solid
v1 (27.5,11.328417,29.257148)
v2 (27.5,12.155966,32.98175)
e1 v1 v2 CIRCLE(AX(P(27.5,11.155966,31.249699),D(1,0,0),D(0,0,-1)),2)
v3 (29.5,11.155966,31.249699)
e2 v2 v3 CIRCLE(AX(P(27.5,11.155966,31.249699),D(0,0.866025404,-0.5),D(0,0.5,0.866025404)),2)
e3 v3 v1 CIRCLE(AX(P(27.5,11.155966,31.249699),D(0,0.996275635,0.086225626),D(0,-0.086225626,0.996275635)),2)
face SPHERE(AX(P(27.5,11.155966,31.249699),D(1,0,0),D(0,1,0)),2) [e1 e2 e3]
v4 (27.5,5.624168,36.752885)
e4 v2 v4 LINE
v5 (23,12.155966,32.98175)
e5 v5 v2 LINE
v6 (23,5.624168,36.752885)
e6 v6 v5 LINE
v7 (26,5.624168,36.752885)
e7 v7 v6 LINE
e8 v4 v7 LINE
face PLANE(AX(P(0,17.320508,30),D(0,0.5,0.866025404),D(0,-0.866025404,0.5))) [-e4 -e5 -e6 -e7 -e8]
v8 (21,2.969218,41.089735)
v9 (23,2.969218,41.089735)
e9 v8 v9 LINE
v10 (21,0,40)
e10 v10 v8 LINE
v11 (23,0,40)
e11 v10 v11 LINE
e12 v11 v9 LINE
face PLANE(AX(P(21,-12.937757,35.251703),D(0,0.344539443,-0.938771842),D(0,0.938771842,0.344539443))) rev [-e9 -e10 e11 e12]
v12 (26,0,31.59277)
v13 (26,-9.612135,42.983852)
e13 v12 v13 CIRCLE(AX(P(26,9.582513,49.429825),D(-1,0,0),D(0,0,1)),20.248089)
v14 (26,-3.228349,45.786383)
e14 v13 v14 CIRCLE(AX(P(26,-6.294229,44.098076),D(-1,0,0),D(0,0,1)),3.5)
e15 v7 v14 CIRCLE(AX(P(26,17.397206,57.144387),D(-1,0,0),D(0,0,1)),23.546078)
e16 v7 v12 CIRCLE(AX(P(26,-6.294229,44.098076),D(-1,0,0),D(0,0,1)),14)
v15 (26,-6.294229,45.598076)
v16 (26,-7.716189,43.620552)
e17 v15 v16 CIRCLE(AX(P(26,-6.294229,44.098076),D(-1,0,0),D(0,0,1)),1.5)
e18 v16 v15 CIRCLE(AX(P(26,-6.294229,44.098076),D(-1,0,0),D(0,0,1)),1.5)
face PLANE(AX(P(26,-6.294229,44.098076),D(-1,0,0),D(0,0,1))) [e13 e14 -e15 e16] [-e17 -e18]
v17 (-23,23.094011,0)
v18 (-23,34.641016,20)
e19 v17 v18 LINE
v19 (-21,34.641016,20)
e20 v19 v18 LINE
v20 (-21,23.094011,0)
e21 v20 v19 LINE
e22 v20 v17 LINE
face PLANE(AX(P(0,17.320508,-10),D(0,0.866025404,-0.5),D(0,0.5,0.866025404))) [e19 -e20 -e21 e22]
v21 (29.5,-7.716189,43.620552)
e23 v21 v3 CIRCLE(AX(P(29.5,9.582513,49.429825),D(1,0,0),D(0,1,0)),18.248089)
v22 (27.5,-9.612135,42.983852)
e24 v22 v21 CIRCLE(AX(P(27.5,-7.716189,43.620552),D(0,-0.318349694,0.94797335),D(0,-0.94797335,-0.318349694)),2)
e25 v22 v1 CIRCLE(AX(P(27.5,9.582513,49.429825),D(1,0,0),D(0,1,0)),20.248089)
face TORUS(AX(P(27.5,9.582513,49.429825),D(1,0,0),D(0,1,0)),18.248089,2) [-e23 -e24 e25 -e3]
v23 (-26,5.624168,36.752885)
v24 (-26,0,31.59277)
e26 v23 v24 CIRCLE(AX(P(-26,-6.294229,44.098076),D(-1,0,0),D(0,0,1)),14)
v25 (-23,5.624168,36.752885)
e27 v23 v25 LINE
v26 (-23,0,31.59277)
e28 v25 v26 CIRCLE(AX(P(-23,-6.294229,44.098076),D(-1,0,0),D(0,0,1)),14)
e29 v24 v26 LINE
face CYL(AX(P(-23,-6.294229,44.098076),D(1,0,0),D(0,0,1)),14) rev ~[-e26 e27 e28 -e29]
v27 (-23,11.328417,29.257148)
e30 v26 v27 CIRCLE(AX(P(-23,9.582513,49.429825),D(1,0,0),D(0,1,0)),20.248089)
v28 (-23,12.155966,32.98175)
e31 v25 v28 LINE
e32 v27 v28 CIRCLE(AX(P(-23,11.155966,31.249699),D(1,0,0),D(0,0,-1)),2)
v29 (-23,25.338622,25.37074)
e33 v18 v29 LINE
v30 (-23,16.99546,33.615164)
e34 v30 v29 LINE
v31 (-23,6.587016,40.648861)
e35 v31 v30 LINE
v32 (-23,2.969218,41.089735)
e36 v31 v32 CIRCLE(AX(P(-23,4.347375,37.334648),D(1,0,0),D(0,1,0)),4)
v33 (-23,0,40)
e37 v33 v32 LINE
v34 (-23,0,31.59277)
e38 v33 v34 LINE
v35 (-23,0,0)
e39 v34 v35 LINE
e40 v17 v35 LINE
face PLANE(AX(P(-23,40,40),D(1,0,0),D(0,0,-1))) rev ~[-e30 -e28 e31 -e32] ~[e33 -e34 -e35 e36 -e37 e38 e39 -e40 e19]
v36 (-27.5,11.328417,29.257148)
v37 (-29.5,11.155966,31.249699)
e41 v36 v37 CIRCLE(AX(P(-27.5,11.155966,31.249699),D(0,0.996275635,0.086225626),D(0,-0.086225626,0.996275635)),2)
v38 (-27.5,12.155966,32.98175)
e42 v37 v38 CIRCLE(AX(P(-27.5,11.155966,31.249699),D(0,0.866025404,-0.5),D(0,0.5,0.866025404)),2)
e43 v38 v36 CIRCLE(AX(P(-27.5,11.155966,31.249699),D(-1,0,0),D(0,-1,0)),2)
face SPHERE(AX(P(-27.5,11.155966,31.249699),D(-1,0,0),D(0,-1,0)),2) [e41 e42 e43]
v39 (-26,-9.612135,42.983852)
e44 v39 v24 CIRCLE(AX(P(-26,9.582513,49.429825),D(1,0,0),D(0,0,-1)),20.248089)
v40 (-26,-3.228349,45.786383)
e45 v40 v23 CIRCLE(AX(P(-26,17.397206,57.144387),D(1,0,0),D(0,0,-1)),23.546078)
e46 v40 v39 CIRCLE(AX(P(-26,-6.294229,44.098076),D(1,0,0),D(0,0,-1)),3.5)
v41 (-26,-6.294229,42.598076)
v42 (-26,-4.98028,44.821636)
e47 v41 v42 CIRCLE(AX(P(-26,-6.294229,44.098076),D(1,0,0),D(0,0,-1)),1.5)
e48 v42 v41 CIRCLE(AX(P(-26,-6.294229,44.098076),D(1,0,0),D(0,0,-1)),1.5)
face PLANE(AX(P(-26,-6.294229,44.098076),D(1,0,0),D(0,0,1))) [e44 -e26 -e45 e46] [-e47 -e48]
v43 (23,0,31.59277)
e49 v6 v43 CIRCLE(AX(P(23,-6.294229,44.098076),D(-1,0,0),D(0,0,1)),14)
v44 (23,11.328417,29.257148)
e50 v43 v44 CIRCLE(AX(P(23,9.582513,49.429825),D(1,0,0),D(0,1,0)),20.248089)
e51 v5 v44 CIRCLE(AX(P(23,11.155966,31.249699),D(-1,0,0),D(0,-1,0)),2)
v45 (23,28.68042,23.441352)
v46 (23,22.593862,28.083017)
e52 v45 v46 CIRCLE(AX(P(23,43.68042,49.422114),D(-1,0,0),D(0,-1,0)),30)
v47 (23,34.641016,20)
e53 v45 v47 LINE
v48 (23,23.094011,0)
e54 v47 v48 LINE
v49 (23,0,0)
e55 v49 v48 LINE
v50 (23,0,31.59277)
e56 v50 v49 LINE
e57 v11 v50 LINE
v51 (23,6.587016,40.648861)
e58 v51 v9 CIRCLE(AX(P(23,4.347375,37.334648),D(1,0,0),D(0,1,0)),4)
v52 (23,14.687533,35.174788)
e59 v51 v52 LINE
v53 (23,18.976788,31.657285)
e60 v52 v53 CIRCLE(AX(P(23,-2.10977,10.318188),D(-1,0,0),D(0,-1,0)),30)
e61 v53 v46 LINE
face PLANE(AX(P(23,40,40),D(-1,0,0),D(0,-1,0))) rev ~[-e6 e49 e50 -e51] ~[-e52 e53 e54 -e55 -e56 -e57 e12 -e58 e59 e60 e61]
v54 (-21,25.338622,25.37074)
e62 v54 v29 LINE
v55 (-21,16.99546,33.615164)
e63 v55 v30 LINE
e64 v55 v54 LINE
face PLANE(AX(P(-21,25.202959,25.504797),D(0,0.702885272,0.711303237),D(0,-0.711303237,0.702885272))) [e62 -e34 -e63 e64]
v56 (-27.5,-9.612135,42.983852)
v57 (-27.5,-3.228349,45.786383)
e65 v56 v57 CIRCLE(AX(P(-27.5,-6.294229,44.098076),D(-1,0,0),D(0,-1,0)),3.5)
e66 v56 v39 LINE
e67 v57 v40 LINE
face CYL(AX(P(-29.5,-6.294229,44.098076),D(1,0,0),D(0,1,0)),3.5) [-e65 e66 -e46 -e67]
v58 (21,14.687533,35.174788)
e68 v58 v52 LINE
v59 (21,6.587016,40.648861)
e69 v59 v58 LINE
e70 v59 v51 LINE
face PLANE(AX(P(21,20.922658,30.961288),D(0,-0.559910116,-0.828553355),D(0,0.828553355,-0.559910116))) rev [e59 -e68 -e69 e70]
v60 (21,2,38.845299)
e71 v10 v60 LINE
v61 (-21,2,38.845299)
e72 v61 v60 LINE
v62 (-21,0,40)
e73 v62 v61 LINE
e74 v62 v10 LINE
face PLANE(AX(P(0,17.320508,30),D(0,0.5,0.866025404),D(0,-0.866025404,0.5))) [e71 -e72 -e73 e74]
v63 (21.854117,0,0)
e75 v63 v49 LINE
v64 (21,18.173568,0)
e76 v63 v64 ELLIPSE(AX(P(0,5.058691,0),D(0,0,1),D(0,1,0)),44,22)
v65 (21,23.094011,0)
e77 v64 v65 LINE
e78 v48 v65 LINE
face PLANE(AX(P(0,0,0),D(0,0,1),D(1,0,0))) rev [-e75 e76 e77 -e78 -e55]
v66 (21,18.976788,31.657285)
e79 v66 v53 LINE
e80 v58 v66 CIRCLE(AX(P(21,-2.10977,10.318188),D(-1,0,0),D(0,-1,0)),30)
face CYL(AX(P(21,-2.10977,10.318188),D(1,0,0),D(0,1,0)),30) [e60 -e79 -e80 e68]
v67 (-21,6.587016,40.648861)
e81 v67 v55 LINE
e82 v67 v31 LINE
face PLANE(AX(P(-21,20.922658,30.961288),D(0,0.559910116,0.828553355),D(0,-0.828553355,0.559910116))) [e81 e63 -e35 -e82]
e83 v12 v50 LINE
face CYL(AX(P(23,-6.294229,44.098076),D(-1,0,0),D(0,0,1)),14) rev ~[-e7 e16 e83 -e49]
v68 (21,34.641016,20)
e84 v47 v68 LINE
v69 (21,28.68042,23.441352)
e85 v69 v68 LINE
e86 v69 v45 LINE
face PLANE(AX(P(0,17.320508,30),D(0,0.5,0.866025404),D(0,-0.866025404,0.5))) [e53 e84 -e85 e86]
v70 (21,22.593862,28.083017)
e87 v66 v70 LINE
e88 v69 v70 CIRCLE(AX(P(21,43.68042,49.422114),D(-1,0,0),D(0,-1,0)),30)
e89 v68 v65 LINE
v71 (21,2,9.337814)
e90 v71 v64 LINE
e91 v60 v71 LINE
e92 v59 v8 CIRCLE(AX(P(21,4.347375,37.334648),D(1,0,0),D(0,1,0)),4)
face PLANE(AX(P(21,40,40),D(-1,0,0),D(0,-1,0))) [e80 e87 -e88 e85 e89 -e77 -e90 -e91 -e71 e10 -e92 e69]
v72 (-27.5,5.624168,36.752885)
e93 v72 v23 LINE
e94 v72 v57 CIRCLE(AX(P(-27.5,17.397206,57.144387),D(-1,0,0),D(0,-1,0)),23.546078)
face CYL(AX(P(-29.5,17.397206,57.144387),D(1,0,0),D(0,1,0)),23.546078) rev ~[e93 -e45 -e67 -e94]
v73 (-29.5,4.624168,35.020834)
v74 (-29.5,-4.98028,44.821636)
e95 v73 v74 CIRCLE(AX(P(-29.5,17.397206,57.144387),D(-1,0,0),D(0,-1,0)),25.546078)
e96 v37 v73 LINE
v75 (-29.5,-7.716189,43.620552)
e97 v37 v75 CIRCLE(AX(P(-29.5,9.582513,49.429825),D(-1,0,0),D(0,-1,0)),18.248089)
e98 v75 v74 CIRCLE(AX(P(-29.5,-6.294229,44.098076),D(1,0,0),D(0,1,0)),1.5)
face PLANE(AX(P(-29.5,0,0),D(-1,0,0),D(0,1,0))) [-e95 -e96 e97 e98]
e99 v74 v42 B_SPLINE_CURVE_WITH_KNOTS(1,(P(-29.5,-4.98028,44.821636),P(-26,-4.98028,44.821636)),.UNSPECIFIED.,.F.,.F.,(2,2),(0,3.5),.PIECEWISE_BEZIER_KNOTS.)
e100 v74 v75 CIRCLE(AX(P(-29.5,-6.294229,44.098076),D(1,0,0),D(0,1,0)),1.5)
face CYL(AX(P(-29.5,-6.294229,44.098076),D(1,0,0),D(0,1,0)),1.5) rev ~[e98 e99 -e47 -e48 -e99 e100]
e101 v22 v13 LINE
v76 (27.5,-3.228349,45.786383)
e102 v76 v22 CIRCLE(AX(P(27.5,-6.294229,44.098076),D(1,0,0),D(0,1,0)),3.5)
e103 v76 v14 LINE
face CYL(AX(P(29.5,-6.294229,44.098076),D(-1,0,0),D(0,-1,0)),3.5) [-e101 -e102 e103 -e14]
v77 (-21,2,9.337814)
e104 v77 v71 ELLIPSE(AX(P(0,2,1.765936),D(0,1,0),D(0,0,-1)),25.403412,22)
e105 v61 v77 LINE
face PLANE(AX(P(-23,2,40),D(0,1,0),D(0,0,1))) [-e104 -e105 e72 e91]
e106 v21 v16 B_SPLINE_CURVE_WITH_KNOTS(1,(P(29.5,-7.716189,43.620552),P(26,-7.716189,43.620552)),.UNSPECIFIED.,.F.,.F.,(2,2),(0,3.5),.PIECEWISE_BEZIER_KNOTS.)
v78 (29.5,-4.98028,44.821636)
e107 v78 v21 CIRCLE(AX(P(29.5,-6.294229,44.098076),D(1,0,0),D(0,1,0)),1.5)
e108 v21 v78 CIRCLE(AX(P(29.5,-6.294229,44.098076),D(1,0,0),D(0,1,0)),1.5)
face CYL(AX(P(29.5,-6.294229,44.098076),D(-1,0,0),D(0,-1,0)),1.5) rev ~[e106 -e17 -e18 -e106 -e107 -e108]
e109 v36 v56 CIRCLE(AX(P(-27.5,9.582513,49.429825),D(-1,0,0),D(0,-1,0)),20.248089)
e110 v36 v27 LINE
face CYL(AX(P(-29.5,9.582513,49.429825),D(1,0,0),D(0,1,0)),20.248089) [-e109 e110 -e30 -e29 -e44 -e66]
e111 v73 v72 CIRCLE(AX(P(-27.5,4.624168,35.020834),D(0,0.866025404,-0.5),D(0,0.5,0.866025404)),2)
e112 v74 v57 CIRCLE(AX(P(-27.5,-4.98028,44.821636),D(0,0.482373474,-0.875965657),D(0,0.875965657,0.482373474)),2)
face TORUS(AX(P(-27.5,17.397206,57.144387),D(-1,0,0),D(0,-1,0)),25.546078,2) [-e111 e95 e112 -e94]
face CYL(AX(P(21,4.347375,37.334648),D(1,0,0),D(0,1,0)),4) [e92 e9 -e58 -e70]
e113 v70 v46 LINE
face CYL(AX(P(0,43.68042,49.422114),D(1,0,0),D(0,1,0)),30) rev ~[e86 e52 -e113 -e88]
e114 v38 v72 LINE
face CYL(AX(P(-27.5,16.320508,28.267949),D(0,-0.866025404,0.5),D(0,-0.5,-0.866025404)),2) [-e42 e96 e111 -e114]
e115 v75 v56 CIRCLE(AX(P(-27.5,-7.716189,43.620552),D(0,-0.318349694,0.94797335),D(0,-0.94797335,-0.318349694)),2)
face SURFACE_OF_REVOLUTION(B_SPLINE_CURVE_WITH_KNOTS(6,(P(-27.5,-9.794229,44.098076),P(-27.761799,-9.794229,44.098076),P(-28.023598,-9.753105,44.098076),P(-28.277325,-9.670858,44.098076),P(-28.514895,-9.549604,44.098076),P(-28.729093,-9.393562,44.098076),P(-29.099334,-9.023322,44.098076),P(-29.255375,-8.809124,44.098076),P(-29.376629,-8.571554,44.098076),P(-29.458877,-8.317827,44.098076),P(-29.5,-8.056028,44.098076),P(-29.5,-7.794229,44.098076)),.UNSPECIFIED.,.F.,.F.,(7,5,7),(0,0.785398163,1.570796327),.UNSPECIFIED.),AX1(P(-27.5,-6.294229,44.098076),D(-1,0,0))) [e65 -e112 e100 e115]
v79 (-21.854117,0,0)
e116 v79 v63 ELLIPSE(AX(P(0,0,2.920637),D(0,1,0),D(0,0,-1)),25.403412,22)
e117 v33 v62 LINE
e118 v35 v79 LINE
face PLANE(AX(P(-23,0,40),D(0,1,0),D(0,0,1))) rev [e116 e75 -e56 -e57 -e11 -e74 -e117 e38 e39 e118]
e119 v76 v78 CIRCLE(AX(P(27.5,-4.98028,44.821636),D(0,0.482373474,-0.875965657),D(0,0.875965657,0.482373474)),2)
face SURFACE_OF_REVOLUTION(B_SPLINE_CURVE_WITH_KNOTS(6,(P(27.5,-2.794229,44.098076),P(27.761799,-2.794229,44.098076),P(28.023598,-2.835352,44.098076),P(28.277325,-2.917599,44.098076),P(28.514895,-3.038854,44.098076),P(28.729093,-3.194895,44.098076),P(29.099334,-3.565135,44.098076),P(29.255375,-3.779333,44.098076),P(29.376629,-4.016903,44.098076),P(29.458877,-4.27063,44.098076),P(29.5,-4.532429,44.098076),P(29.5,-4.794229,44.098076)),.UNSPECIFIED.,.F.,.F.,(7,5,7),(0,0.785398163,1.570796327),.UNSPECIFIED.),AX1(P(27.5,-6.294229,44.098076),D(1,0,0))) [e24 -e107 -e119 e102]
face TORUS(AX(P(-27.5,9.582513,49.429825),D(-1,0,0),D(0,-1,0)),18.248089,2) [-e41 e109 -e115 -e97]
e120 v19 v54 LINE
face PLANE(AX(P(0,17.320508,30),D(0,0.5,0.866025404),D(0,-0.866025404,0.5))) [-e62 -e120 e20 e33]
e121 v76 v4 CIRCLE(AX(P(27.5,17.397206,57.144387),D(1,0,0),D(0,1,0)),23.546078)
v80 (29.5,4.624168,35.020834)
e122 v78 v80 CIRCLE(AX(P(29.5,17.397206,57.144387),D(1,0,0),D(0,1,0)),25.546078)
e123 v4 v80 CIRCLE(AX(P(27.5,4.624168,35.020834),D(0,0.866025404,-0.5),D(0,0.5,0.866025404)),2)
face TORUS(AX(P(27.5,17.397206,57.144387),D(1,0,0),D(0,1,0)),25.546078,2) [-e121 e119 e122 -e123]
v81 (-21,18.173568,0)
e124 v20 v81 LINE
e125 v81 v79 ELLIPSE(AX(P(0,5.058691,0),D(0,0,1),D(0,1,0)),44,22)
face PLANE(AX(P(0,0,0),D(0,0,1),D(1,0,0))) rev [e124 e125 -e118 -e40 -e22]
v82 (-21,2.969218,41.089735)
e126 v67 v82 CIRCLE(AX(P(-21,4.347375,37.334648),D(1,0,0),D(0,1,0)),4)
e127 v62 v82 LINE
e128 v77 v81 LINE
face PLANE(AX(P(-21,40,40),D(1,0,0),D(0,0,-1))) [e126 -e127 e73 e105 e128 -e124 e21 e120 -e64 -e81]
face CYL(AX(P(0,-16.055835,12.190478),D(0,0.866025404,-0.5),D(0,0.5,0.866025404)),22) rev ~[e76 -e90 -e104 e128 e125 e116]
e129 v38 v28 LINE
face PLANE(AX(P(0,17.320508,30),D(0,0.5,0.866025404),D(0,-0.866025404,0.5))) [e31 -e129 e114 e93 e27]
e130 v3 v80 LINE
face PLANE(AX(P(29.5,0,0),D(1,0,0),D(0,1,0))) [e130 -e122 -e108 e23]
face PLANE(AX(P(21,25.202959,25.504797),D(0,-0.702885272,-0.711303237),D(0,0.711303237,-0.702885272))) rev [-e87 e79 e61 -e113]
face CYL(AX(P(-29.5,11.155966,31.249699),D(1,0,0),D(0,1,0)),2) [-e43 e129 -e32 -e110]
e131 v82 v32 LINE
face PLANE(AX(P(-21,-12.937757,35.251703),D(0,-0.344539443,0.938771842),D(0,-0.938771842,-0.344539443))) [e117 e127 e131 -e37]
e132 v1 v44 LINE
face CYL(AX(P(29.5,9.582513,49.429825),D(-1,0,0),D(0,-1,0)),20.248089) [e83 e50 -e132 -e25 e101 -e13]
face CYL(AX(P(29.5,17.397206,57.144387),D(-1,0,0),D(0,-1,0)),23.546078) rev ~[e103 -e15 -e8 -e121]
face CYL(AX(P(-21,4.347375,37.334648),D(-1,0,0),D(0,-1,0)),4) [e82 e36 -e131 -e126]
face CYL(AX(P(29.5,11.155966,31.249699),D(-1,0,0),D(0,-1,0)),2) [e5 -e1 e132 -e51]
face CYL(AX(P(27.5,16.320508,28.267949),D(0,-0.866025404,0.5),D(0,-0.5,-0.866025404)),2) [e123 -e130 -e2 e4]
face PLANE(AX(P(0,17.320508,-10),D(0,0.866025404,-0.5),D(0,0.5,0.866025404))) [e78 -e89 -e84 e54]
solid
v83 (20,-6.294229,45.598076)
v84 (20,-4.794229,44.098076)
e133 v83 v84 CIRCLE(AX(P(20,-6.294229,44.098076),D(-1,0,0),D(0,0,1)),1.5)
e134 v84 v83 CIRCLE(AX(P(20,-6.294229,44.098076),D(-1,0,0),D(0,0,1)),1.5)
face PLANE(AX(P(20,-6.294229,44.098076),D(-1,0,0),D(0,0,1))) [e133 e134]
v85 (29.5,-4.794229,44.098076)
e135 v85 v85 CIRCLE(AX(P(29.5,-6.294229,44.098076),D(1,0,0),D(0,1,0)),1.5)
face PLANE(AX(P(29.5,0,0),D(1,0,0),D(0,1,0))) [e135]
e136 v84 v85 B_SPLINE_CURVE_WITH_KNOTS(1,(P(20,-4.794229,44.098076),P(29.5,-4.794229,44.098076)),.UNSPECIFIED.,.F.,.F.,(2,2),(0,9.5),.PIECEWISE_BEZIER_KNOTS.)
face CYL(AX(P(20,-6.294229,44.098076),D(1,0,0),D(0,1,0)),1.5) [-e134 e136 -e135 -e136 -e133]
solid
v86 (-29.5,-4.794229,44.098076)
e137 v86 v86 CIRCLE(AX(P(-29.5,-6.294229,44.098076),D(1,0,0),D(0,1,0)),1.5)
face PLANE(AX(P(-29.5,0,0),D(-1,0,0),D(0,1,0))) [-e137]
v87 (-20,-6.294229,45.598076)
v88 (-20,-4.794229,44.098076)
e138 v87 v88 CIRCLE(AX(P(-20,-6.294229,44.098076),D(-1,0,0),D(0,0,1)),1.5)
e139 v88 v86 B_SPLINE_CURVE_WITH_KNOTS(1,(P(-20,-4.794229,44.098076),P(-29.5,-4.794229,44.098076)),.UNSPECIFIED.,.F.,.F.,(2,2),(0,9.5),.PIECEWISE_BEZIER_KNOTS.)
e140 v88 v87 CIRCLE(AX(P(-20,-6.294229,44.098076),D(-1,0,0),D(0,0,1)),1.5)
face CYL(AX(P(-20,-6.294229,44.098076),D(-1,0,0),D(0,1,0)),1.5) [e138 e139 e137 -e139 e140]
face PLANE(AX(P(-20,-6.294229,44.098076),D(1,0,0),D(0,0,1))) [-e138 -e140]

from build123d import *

# Parameters (mm, degrees)
SKETCH1_W                = 46
SKETCH1_H                = 40
BOSS_EXTRUDE1_DEPTH      = 40
SHELL1_T                 = -2
CUT_EXTRUDE1_DEPTH       = 62.065538563
CUT_EXTRUDE1_DEPTH_BACK  = 62.065538563
SKETCH2_R                = 22
SKETCH5_R                = 1.5
BOSS_EXTRUDE2_DEPTH      = 6.5
BOSS_EXTRUDE4_DEPTH      = 2
SKETCH6_W                = 3
SKETCH6_H                = 14
FILLET1_R                = 30
FILLET2_R                = 2
BOSS_EXTRUDE5_DEPTH      = 3.5
BOSS_EXTRUDE5_DEPTH_BACK = 6
BOSS_EXTRUDE5_START      = 3
SKETCH5_4_R              = 1.5
FILLET2_OF_MIRROR2_R     = 2


with BuildPart() as part:
    # Sketch1 → Boss-Extrude1 (new body)
    with BuildSketch(Plane.XY):
        with Locations((0, 20)):
            Rectangle(SKETCH1_W, SKETCH1_H)
    extrude(amount=BOSS_EXTRUDE1_DEPTH)

    # Shell1
    shell1_openings = [part.faces().sort_by_distance(p)[0] for p in [
        (0, 20, 40),
        (0, 20, 0),
        (0, 40, 20),
    ]]
    offset(amount=SHELL1_T, openings=shell1_openings, kind=Kind.INTERSECTION)

    # Sketch2 → Cut-Extrude1 (cut, two sides: drawn at the far end of the back side and taken through both)
    with BuildSketch(Plane(origin=(0, 0, 0), x_dir=(1, 0, 0), z_dir=(0, 0.866025403784438, -0.5000000000000009)).offset(-CUT_EXTRUDE1_DEPTH_BACK)):
        with Locations((0, -2.529345721)):
            Circle(SKETCH2_R)
    extrude(amount=CUT_EXTRUDE1_DEPTH + CUT_EXTRUDE1_DEPTH_BACK, mode=Mode.SUBTRACT)

    # SurfaceCut1
    split(bisect_by=Plane(origin=(0, 17.320508076, 30), x_dir=(1, 0, 0), z_dir=(0, 0.500000000000001, 0.8660254037844382)), keep=Keep.BOTTOM)

    # SurfaceCut3
    split(bisect_by=Plane(origin=(0, 17.320508076, -10), x_dir=(1, 0, 0), z_dir=(0, 0.8660254037844383, -0.5000000000000009)), keep=Keep.BOTTOM)

    # Sketch5 → Boss-Extrude2 (add)
    with BuildSketch(Plane(origin=(23, 0, 0), x_dir=(0, 0, -1), z_dir=(1, 0, 0))):
        with BuildLine():
            Line((-30.428606571, 16.578139719), (-36.752885286, 5.624167662))
            ThreePointArc((-36.752885286, 5.624167662), (-40.664109848, 0.580005541), (-45.78638337, -3.228348836))
            ThreePointArc((-45.78638337, -3.228348836), (-47.30285007, -7.701148858), (-42.983852284, -9.61213536))
            ThreePointArc((-42.983852284, -9.61213536), (-31.17133355, 0.829651746), (-30.428606571, 16.578139719))
        make_face()
        with Locations(Location((-44.098076211, -6.294228634, 0), (0, 0, 270))):
            Circle(SKETCH5_R, mode=Mode.SUBTRACT)
    boss_extrude2 = extrude(amount=BOSS_EXTRUDE2_DEPTH)

    # Sketch7 → Boss-Extrude4 (add)
    with BuildSketch(Plane(origin=(23, 0, 0), x_dir=(0, 0, -1), z_dir=(1, 0, 0))):
        with BuildLine():
            Line((-40, 0), (-41.089735051, 2.969217608))
            ThreePointArc((-41.089735051, 2.969217608), (-41.305273506, 4.831245785), (-40.648861101, 6.587015847))
            Line((-40.648861101, 6.587015847), (-33.615164299, 16.99545983))
            Line((-33.615164299, 16.99545983), (-25.370739685, 25.338622143))
            Line((-25.370739685, 25.338622143), (-40, 0))
        make_face()
    boss_extrude4 = extrude(amount=-BOSS_EXTRUDE4_DEPTH)

    # Sketch6 → Cut-Revolve1 (revolve, cut)
    with BuildSketch(Plane(origin=(0, -27.5, 7.368602792), x_dir=(1, 0, 0), z_dir=(0, 0.8660254037844382, -0.500000000000001)), mode=Mode.PRIVATE) as cut_revolve1_sk:
        with Locations((24.5, -35.411542732)):
            Rectangle(SKETCH6_W, SKETCH6_H)
    cut_revolve1 = revolve(cut_revolve1_sk.sketch.rotate(Axis((23, -6.294228634, 44.098076211), (1, 0, 0)), 300), axis=Axis((23, -6.294228634, 44.098076211), (1, 0, 0)), mode=Mode.SUBTRACT)

    # Fillet1
    fillet1_edges = [part.edges().sort_by_distance(p)[0] for p in [
        (22, 25.338622143, 25.370739685),
        (22, 16.99545983, 33.615164299),
    ]]
    fillet(fillet1_edges, radius=FILLET1_R)

    # Fillet2
    fillet2_edges = [part.edges().sort_by_distance(p)[0] for p in [
        (26.25, 16.578139719, 30.428606571),
        (29.5, 0.580005541, 40.664109848),
        (29.5, 0.829651746, 31.17133355),
        (29.5, 11.101153691, 33.590745928),
        (29.5, -7.701148858, 47.30285007),
    ]]
    fillet(fillet2_edges, radius=FILLET2_R - 0.0001)  # a hair under: the kernel refuses the full size

    # Mirror2: Boss-Extrude2, Boss-Extrude4, Cut-Revolve1 across plane
    add(boss_extrude2.mirror(Plane(origin=(0, 0, 0), x_dir=(0, 0, 1), z_dir=(1, 0, 0))))
    add(boss_extrude4.mirror(Plane(origin=(0, 0, 0), x_dir=(0, 0, 1), z_dir=(1, 0, 0))))
    add(cut_revolve1.mirror(Plane(origin=(0, 0, 0), x_dir=(0, 0, 1), z_dir=(1, 0, 0))), mode=Mode.SUBTRACT)

    # Fillet2 of Mirror2
    fillet2_of_mirror2_edges = [part.edges().sort_by_distance(p)[0] for p in [
        (-26.25, 16.578139719, 30.428606571),
        (-29.5, 0.580005541, 40.664109848),
        (-29.5, 0.829651746, 31.17133355),
        (-29.5, 11.101153691, 33.590745928),
        (-29.5, -7.701148858, 47.30285007),
    ]]
    fillet(fillet2_of_mirror2_edges, radius=FILLET2_OF_MIRROR2_R - 0.0001)  # a hair under: the kernel refuses the full size


with BuildPart() as body_2:
    # Sketch5<4> → Boss-Extrude5 (new, two sides: drawn at the far end of the back side and taken through both)
    with BuildSketch(Plane(origin=(23, 0, 0), x_dir=(0, 0, -1), z_dir=(1, 0, 0)).offset(BOSS_EXTRUDE5_START - BOSS_EXTRUDE5_DEPTH_BACK)):
        with Locations(Location((-44.098076211, -6.294228634, 0), (0, 0, 90))):
            Circle(SKETCH5_4_R)
    extrude(amount=BOSS_EXTRUDE5_DEPTH + BOSS_EXTRUDE5_DEPTH_BACK)


with BuildPart() as body_3:
    # Mirror4: mirrored copy
    add(body_2.part.mirror(Plane(origin=(0, 0, 0), x_dir=(0, 0, 1), z_dir=(1, 0, 0))))


solid = Compound([part.part, body_2.part, body_3.part])
